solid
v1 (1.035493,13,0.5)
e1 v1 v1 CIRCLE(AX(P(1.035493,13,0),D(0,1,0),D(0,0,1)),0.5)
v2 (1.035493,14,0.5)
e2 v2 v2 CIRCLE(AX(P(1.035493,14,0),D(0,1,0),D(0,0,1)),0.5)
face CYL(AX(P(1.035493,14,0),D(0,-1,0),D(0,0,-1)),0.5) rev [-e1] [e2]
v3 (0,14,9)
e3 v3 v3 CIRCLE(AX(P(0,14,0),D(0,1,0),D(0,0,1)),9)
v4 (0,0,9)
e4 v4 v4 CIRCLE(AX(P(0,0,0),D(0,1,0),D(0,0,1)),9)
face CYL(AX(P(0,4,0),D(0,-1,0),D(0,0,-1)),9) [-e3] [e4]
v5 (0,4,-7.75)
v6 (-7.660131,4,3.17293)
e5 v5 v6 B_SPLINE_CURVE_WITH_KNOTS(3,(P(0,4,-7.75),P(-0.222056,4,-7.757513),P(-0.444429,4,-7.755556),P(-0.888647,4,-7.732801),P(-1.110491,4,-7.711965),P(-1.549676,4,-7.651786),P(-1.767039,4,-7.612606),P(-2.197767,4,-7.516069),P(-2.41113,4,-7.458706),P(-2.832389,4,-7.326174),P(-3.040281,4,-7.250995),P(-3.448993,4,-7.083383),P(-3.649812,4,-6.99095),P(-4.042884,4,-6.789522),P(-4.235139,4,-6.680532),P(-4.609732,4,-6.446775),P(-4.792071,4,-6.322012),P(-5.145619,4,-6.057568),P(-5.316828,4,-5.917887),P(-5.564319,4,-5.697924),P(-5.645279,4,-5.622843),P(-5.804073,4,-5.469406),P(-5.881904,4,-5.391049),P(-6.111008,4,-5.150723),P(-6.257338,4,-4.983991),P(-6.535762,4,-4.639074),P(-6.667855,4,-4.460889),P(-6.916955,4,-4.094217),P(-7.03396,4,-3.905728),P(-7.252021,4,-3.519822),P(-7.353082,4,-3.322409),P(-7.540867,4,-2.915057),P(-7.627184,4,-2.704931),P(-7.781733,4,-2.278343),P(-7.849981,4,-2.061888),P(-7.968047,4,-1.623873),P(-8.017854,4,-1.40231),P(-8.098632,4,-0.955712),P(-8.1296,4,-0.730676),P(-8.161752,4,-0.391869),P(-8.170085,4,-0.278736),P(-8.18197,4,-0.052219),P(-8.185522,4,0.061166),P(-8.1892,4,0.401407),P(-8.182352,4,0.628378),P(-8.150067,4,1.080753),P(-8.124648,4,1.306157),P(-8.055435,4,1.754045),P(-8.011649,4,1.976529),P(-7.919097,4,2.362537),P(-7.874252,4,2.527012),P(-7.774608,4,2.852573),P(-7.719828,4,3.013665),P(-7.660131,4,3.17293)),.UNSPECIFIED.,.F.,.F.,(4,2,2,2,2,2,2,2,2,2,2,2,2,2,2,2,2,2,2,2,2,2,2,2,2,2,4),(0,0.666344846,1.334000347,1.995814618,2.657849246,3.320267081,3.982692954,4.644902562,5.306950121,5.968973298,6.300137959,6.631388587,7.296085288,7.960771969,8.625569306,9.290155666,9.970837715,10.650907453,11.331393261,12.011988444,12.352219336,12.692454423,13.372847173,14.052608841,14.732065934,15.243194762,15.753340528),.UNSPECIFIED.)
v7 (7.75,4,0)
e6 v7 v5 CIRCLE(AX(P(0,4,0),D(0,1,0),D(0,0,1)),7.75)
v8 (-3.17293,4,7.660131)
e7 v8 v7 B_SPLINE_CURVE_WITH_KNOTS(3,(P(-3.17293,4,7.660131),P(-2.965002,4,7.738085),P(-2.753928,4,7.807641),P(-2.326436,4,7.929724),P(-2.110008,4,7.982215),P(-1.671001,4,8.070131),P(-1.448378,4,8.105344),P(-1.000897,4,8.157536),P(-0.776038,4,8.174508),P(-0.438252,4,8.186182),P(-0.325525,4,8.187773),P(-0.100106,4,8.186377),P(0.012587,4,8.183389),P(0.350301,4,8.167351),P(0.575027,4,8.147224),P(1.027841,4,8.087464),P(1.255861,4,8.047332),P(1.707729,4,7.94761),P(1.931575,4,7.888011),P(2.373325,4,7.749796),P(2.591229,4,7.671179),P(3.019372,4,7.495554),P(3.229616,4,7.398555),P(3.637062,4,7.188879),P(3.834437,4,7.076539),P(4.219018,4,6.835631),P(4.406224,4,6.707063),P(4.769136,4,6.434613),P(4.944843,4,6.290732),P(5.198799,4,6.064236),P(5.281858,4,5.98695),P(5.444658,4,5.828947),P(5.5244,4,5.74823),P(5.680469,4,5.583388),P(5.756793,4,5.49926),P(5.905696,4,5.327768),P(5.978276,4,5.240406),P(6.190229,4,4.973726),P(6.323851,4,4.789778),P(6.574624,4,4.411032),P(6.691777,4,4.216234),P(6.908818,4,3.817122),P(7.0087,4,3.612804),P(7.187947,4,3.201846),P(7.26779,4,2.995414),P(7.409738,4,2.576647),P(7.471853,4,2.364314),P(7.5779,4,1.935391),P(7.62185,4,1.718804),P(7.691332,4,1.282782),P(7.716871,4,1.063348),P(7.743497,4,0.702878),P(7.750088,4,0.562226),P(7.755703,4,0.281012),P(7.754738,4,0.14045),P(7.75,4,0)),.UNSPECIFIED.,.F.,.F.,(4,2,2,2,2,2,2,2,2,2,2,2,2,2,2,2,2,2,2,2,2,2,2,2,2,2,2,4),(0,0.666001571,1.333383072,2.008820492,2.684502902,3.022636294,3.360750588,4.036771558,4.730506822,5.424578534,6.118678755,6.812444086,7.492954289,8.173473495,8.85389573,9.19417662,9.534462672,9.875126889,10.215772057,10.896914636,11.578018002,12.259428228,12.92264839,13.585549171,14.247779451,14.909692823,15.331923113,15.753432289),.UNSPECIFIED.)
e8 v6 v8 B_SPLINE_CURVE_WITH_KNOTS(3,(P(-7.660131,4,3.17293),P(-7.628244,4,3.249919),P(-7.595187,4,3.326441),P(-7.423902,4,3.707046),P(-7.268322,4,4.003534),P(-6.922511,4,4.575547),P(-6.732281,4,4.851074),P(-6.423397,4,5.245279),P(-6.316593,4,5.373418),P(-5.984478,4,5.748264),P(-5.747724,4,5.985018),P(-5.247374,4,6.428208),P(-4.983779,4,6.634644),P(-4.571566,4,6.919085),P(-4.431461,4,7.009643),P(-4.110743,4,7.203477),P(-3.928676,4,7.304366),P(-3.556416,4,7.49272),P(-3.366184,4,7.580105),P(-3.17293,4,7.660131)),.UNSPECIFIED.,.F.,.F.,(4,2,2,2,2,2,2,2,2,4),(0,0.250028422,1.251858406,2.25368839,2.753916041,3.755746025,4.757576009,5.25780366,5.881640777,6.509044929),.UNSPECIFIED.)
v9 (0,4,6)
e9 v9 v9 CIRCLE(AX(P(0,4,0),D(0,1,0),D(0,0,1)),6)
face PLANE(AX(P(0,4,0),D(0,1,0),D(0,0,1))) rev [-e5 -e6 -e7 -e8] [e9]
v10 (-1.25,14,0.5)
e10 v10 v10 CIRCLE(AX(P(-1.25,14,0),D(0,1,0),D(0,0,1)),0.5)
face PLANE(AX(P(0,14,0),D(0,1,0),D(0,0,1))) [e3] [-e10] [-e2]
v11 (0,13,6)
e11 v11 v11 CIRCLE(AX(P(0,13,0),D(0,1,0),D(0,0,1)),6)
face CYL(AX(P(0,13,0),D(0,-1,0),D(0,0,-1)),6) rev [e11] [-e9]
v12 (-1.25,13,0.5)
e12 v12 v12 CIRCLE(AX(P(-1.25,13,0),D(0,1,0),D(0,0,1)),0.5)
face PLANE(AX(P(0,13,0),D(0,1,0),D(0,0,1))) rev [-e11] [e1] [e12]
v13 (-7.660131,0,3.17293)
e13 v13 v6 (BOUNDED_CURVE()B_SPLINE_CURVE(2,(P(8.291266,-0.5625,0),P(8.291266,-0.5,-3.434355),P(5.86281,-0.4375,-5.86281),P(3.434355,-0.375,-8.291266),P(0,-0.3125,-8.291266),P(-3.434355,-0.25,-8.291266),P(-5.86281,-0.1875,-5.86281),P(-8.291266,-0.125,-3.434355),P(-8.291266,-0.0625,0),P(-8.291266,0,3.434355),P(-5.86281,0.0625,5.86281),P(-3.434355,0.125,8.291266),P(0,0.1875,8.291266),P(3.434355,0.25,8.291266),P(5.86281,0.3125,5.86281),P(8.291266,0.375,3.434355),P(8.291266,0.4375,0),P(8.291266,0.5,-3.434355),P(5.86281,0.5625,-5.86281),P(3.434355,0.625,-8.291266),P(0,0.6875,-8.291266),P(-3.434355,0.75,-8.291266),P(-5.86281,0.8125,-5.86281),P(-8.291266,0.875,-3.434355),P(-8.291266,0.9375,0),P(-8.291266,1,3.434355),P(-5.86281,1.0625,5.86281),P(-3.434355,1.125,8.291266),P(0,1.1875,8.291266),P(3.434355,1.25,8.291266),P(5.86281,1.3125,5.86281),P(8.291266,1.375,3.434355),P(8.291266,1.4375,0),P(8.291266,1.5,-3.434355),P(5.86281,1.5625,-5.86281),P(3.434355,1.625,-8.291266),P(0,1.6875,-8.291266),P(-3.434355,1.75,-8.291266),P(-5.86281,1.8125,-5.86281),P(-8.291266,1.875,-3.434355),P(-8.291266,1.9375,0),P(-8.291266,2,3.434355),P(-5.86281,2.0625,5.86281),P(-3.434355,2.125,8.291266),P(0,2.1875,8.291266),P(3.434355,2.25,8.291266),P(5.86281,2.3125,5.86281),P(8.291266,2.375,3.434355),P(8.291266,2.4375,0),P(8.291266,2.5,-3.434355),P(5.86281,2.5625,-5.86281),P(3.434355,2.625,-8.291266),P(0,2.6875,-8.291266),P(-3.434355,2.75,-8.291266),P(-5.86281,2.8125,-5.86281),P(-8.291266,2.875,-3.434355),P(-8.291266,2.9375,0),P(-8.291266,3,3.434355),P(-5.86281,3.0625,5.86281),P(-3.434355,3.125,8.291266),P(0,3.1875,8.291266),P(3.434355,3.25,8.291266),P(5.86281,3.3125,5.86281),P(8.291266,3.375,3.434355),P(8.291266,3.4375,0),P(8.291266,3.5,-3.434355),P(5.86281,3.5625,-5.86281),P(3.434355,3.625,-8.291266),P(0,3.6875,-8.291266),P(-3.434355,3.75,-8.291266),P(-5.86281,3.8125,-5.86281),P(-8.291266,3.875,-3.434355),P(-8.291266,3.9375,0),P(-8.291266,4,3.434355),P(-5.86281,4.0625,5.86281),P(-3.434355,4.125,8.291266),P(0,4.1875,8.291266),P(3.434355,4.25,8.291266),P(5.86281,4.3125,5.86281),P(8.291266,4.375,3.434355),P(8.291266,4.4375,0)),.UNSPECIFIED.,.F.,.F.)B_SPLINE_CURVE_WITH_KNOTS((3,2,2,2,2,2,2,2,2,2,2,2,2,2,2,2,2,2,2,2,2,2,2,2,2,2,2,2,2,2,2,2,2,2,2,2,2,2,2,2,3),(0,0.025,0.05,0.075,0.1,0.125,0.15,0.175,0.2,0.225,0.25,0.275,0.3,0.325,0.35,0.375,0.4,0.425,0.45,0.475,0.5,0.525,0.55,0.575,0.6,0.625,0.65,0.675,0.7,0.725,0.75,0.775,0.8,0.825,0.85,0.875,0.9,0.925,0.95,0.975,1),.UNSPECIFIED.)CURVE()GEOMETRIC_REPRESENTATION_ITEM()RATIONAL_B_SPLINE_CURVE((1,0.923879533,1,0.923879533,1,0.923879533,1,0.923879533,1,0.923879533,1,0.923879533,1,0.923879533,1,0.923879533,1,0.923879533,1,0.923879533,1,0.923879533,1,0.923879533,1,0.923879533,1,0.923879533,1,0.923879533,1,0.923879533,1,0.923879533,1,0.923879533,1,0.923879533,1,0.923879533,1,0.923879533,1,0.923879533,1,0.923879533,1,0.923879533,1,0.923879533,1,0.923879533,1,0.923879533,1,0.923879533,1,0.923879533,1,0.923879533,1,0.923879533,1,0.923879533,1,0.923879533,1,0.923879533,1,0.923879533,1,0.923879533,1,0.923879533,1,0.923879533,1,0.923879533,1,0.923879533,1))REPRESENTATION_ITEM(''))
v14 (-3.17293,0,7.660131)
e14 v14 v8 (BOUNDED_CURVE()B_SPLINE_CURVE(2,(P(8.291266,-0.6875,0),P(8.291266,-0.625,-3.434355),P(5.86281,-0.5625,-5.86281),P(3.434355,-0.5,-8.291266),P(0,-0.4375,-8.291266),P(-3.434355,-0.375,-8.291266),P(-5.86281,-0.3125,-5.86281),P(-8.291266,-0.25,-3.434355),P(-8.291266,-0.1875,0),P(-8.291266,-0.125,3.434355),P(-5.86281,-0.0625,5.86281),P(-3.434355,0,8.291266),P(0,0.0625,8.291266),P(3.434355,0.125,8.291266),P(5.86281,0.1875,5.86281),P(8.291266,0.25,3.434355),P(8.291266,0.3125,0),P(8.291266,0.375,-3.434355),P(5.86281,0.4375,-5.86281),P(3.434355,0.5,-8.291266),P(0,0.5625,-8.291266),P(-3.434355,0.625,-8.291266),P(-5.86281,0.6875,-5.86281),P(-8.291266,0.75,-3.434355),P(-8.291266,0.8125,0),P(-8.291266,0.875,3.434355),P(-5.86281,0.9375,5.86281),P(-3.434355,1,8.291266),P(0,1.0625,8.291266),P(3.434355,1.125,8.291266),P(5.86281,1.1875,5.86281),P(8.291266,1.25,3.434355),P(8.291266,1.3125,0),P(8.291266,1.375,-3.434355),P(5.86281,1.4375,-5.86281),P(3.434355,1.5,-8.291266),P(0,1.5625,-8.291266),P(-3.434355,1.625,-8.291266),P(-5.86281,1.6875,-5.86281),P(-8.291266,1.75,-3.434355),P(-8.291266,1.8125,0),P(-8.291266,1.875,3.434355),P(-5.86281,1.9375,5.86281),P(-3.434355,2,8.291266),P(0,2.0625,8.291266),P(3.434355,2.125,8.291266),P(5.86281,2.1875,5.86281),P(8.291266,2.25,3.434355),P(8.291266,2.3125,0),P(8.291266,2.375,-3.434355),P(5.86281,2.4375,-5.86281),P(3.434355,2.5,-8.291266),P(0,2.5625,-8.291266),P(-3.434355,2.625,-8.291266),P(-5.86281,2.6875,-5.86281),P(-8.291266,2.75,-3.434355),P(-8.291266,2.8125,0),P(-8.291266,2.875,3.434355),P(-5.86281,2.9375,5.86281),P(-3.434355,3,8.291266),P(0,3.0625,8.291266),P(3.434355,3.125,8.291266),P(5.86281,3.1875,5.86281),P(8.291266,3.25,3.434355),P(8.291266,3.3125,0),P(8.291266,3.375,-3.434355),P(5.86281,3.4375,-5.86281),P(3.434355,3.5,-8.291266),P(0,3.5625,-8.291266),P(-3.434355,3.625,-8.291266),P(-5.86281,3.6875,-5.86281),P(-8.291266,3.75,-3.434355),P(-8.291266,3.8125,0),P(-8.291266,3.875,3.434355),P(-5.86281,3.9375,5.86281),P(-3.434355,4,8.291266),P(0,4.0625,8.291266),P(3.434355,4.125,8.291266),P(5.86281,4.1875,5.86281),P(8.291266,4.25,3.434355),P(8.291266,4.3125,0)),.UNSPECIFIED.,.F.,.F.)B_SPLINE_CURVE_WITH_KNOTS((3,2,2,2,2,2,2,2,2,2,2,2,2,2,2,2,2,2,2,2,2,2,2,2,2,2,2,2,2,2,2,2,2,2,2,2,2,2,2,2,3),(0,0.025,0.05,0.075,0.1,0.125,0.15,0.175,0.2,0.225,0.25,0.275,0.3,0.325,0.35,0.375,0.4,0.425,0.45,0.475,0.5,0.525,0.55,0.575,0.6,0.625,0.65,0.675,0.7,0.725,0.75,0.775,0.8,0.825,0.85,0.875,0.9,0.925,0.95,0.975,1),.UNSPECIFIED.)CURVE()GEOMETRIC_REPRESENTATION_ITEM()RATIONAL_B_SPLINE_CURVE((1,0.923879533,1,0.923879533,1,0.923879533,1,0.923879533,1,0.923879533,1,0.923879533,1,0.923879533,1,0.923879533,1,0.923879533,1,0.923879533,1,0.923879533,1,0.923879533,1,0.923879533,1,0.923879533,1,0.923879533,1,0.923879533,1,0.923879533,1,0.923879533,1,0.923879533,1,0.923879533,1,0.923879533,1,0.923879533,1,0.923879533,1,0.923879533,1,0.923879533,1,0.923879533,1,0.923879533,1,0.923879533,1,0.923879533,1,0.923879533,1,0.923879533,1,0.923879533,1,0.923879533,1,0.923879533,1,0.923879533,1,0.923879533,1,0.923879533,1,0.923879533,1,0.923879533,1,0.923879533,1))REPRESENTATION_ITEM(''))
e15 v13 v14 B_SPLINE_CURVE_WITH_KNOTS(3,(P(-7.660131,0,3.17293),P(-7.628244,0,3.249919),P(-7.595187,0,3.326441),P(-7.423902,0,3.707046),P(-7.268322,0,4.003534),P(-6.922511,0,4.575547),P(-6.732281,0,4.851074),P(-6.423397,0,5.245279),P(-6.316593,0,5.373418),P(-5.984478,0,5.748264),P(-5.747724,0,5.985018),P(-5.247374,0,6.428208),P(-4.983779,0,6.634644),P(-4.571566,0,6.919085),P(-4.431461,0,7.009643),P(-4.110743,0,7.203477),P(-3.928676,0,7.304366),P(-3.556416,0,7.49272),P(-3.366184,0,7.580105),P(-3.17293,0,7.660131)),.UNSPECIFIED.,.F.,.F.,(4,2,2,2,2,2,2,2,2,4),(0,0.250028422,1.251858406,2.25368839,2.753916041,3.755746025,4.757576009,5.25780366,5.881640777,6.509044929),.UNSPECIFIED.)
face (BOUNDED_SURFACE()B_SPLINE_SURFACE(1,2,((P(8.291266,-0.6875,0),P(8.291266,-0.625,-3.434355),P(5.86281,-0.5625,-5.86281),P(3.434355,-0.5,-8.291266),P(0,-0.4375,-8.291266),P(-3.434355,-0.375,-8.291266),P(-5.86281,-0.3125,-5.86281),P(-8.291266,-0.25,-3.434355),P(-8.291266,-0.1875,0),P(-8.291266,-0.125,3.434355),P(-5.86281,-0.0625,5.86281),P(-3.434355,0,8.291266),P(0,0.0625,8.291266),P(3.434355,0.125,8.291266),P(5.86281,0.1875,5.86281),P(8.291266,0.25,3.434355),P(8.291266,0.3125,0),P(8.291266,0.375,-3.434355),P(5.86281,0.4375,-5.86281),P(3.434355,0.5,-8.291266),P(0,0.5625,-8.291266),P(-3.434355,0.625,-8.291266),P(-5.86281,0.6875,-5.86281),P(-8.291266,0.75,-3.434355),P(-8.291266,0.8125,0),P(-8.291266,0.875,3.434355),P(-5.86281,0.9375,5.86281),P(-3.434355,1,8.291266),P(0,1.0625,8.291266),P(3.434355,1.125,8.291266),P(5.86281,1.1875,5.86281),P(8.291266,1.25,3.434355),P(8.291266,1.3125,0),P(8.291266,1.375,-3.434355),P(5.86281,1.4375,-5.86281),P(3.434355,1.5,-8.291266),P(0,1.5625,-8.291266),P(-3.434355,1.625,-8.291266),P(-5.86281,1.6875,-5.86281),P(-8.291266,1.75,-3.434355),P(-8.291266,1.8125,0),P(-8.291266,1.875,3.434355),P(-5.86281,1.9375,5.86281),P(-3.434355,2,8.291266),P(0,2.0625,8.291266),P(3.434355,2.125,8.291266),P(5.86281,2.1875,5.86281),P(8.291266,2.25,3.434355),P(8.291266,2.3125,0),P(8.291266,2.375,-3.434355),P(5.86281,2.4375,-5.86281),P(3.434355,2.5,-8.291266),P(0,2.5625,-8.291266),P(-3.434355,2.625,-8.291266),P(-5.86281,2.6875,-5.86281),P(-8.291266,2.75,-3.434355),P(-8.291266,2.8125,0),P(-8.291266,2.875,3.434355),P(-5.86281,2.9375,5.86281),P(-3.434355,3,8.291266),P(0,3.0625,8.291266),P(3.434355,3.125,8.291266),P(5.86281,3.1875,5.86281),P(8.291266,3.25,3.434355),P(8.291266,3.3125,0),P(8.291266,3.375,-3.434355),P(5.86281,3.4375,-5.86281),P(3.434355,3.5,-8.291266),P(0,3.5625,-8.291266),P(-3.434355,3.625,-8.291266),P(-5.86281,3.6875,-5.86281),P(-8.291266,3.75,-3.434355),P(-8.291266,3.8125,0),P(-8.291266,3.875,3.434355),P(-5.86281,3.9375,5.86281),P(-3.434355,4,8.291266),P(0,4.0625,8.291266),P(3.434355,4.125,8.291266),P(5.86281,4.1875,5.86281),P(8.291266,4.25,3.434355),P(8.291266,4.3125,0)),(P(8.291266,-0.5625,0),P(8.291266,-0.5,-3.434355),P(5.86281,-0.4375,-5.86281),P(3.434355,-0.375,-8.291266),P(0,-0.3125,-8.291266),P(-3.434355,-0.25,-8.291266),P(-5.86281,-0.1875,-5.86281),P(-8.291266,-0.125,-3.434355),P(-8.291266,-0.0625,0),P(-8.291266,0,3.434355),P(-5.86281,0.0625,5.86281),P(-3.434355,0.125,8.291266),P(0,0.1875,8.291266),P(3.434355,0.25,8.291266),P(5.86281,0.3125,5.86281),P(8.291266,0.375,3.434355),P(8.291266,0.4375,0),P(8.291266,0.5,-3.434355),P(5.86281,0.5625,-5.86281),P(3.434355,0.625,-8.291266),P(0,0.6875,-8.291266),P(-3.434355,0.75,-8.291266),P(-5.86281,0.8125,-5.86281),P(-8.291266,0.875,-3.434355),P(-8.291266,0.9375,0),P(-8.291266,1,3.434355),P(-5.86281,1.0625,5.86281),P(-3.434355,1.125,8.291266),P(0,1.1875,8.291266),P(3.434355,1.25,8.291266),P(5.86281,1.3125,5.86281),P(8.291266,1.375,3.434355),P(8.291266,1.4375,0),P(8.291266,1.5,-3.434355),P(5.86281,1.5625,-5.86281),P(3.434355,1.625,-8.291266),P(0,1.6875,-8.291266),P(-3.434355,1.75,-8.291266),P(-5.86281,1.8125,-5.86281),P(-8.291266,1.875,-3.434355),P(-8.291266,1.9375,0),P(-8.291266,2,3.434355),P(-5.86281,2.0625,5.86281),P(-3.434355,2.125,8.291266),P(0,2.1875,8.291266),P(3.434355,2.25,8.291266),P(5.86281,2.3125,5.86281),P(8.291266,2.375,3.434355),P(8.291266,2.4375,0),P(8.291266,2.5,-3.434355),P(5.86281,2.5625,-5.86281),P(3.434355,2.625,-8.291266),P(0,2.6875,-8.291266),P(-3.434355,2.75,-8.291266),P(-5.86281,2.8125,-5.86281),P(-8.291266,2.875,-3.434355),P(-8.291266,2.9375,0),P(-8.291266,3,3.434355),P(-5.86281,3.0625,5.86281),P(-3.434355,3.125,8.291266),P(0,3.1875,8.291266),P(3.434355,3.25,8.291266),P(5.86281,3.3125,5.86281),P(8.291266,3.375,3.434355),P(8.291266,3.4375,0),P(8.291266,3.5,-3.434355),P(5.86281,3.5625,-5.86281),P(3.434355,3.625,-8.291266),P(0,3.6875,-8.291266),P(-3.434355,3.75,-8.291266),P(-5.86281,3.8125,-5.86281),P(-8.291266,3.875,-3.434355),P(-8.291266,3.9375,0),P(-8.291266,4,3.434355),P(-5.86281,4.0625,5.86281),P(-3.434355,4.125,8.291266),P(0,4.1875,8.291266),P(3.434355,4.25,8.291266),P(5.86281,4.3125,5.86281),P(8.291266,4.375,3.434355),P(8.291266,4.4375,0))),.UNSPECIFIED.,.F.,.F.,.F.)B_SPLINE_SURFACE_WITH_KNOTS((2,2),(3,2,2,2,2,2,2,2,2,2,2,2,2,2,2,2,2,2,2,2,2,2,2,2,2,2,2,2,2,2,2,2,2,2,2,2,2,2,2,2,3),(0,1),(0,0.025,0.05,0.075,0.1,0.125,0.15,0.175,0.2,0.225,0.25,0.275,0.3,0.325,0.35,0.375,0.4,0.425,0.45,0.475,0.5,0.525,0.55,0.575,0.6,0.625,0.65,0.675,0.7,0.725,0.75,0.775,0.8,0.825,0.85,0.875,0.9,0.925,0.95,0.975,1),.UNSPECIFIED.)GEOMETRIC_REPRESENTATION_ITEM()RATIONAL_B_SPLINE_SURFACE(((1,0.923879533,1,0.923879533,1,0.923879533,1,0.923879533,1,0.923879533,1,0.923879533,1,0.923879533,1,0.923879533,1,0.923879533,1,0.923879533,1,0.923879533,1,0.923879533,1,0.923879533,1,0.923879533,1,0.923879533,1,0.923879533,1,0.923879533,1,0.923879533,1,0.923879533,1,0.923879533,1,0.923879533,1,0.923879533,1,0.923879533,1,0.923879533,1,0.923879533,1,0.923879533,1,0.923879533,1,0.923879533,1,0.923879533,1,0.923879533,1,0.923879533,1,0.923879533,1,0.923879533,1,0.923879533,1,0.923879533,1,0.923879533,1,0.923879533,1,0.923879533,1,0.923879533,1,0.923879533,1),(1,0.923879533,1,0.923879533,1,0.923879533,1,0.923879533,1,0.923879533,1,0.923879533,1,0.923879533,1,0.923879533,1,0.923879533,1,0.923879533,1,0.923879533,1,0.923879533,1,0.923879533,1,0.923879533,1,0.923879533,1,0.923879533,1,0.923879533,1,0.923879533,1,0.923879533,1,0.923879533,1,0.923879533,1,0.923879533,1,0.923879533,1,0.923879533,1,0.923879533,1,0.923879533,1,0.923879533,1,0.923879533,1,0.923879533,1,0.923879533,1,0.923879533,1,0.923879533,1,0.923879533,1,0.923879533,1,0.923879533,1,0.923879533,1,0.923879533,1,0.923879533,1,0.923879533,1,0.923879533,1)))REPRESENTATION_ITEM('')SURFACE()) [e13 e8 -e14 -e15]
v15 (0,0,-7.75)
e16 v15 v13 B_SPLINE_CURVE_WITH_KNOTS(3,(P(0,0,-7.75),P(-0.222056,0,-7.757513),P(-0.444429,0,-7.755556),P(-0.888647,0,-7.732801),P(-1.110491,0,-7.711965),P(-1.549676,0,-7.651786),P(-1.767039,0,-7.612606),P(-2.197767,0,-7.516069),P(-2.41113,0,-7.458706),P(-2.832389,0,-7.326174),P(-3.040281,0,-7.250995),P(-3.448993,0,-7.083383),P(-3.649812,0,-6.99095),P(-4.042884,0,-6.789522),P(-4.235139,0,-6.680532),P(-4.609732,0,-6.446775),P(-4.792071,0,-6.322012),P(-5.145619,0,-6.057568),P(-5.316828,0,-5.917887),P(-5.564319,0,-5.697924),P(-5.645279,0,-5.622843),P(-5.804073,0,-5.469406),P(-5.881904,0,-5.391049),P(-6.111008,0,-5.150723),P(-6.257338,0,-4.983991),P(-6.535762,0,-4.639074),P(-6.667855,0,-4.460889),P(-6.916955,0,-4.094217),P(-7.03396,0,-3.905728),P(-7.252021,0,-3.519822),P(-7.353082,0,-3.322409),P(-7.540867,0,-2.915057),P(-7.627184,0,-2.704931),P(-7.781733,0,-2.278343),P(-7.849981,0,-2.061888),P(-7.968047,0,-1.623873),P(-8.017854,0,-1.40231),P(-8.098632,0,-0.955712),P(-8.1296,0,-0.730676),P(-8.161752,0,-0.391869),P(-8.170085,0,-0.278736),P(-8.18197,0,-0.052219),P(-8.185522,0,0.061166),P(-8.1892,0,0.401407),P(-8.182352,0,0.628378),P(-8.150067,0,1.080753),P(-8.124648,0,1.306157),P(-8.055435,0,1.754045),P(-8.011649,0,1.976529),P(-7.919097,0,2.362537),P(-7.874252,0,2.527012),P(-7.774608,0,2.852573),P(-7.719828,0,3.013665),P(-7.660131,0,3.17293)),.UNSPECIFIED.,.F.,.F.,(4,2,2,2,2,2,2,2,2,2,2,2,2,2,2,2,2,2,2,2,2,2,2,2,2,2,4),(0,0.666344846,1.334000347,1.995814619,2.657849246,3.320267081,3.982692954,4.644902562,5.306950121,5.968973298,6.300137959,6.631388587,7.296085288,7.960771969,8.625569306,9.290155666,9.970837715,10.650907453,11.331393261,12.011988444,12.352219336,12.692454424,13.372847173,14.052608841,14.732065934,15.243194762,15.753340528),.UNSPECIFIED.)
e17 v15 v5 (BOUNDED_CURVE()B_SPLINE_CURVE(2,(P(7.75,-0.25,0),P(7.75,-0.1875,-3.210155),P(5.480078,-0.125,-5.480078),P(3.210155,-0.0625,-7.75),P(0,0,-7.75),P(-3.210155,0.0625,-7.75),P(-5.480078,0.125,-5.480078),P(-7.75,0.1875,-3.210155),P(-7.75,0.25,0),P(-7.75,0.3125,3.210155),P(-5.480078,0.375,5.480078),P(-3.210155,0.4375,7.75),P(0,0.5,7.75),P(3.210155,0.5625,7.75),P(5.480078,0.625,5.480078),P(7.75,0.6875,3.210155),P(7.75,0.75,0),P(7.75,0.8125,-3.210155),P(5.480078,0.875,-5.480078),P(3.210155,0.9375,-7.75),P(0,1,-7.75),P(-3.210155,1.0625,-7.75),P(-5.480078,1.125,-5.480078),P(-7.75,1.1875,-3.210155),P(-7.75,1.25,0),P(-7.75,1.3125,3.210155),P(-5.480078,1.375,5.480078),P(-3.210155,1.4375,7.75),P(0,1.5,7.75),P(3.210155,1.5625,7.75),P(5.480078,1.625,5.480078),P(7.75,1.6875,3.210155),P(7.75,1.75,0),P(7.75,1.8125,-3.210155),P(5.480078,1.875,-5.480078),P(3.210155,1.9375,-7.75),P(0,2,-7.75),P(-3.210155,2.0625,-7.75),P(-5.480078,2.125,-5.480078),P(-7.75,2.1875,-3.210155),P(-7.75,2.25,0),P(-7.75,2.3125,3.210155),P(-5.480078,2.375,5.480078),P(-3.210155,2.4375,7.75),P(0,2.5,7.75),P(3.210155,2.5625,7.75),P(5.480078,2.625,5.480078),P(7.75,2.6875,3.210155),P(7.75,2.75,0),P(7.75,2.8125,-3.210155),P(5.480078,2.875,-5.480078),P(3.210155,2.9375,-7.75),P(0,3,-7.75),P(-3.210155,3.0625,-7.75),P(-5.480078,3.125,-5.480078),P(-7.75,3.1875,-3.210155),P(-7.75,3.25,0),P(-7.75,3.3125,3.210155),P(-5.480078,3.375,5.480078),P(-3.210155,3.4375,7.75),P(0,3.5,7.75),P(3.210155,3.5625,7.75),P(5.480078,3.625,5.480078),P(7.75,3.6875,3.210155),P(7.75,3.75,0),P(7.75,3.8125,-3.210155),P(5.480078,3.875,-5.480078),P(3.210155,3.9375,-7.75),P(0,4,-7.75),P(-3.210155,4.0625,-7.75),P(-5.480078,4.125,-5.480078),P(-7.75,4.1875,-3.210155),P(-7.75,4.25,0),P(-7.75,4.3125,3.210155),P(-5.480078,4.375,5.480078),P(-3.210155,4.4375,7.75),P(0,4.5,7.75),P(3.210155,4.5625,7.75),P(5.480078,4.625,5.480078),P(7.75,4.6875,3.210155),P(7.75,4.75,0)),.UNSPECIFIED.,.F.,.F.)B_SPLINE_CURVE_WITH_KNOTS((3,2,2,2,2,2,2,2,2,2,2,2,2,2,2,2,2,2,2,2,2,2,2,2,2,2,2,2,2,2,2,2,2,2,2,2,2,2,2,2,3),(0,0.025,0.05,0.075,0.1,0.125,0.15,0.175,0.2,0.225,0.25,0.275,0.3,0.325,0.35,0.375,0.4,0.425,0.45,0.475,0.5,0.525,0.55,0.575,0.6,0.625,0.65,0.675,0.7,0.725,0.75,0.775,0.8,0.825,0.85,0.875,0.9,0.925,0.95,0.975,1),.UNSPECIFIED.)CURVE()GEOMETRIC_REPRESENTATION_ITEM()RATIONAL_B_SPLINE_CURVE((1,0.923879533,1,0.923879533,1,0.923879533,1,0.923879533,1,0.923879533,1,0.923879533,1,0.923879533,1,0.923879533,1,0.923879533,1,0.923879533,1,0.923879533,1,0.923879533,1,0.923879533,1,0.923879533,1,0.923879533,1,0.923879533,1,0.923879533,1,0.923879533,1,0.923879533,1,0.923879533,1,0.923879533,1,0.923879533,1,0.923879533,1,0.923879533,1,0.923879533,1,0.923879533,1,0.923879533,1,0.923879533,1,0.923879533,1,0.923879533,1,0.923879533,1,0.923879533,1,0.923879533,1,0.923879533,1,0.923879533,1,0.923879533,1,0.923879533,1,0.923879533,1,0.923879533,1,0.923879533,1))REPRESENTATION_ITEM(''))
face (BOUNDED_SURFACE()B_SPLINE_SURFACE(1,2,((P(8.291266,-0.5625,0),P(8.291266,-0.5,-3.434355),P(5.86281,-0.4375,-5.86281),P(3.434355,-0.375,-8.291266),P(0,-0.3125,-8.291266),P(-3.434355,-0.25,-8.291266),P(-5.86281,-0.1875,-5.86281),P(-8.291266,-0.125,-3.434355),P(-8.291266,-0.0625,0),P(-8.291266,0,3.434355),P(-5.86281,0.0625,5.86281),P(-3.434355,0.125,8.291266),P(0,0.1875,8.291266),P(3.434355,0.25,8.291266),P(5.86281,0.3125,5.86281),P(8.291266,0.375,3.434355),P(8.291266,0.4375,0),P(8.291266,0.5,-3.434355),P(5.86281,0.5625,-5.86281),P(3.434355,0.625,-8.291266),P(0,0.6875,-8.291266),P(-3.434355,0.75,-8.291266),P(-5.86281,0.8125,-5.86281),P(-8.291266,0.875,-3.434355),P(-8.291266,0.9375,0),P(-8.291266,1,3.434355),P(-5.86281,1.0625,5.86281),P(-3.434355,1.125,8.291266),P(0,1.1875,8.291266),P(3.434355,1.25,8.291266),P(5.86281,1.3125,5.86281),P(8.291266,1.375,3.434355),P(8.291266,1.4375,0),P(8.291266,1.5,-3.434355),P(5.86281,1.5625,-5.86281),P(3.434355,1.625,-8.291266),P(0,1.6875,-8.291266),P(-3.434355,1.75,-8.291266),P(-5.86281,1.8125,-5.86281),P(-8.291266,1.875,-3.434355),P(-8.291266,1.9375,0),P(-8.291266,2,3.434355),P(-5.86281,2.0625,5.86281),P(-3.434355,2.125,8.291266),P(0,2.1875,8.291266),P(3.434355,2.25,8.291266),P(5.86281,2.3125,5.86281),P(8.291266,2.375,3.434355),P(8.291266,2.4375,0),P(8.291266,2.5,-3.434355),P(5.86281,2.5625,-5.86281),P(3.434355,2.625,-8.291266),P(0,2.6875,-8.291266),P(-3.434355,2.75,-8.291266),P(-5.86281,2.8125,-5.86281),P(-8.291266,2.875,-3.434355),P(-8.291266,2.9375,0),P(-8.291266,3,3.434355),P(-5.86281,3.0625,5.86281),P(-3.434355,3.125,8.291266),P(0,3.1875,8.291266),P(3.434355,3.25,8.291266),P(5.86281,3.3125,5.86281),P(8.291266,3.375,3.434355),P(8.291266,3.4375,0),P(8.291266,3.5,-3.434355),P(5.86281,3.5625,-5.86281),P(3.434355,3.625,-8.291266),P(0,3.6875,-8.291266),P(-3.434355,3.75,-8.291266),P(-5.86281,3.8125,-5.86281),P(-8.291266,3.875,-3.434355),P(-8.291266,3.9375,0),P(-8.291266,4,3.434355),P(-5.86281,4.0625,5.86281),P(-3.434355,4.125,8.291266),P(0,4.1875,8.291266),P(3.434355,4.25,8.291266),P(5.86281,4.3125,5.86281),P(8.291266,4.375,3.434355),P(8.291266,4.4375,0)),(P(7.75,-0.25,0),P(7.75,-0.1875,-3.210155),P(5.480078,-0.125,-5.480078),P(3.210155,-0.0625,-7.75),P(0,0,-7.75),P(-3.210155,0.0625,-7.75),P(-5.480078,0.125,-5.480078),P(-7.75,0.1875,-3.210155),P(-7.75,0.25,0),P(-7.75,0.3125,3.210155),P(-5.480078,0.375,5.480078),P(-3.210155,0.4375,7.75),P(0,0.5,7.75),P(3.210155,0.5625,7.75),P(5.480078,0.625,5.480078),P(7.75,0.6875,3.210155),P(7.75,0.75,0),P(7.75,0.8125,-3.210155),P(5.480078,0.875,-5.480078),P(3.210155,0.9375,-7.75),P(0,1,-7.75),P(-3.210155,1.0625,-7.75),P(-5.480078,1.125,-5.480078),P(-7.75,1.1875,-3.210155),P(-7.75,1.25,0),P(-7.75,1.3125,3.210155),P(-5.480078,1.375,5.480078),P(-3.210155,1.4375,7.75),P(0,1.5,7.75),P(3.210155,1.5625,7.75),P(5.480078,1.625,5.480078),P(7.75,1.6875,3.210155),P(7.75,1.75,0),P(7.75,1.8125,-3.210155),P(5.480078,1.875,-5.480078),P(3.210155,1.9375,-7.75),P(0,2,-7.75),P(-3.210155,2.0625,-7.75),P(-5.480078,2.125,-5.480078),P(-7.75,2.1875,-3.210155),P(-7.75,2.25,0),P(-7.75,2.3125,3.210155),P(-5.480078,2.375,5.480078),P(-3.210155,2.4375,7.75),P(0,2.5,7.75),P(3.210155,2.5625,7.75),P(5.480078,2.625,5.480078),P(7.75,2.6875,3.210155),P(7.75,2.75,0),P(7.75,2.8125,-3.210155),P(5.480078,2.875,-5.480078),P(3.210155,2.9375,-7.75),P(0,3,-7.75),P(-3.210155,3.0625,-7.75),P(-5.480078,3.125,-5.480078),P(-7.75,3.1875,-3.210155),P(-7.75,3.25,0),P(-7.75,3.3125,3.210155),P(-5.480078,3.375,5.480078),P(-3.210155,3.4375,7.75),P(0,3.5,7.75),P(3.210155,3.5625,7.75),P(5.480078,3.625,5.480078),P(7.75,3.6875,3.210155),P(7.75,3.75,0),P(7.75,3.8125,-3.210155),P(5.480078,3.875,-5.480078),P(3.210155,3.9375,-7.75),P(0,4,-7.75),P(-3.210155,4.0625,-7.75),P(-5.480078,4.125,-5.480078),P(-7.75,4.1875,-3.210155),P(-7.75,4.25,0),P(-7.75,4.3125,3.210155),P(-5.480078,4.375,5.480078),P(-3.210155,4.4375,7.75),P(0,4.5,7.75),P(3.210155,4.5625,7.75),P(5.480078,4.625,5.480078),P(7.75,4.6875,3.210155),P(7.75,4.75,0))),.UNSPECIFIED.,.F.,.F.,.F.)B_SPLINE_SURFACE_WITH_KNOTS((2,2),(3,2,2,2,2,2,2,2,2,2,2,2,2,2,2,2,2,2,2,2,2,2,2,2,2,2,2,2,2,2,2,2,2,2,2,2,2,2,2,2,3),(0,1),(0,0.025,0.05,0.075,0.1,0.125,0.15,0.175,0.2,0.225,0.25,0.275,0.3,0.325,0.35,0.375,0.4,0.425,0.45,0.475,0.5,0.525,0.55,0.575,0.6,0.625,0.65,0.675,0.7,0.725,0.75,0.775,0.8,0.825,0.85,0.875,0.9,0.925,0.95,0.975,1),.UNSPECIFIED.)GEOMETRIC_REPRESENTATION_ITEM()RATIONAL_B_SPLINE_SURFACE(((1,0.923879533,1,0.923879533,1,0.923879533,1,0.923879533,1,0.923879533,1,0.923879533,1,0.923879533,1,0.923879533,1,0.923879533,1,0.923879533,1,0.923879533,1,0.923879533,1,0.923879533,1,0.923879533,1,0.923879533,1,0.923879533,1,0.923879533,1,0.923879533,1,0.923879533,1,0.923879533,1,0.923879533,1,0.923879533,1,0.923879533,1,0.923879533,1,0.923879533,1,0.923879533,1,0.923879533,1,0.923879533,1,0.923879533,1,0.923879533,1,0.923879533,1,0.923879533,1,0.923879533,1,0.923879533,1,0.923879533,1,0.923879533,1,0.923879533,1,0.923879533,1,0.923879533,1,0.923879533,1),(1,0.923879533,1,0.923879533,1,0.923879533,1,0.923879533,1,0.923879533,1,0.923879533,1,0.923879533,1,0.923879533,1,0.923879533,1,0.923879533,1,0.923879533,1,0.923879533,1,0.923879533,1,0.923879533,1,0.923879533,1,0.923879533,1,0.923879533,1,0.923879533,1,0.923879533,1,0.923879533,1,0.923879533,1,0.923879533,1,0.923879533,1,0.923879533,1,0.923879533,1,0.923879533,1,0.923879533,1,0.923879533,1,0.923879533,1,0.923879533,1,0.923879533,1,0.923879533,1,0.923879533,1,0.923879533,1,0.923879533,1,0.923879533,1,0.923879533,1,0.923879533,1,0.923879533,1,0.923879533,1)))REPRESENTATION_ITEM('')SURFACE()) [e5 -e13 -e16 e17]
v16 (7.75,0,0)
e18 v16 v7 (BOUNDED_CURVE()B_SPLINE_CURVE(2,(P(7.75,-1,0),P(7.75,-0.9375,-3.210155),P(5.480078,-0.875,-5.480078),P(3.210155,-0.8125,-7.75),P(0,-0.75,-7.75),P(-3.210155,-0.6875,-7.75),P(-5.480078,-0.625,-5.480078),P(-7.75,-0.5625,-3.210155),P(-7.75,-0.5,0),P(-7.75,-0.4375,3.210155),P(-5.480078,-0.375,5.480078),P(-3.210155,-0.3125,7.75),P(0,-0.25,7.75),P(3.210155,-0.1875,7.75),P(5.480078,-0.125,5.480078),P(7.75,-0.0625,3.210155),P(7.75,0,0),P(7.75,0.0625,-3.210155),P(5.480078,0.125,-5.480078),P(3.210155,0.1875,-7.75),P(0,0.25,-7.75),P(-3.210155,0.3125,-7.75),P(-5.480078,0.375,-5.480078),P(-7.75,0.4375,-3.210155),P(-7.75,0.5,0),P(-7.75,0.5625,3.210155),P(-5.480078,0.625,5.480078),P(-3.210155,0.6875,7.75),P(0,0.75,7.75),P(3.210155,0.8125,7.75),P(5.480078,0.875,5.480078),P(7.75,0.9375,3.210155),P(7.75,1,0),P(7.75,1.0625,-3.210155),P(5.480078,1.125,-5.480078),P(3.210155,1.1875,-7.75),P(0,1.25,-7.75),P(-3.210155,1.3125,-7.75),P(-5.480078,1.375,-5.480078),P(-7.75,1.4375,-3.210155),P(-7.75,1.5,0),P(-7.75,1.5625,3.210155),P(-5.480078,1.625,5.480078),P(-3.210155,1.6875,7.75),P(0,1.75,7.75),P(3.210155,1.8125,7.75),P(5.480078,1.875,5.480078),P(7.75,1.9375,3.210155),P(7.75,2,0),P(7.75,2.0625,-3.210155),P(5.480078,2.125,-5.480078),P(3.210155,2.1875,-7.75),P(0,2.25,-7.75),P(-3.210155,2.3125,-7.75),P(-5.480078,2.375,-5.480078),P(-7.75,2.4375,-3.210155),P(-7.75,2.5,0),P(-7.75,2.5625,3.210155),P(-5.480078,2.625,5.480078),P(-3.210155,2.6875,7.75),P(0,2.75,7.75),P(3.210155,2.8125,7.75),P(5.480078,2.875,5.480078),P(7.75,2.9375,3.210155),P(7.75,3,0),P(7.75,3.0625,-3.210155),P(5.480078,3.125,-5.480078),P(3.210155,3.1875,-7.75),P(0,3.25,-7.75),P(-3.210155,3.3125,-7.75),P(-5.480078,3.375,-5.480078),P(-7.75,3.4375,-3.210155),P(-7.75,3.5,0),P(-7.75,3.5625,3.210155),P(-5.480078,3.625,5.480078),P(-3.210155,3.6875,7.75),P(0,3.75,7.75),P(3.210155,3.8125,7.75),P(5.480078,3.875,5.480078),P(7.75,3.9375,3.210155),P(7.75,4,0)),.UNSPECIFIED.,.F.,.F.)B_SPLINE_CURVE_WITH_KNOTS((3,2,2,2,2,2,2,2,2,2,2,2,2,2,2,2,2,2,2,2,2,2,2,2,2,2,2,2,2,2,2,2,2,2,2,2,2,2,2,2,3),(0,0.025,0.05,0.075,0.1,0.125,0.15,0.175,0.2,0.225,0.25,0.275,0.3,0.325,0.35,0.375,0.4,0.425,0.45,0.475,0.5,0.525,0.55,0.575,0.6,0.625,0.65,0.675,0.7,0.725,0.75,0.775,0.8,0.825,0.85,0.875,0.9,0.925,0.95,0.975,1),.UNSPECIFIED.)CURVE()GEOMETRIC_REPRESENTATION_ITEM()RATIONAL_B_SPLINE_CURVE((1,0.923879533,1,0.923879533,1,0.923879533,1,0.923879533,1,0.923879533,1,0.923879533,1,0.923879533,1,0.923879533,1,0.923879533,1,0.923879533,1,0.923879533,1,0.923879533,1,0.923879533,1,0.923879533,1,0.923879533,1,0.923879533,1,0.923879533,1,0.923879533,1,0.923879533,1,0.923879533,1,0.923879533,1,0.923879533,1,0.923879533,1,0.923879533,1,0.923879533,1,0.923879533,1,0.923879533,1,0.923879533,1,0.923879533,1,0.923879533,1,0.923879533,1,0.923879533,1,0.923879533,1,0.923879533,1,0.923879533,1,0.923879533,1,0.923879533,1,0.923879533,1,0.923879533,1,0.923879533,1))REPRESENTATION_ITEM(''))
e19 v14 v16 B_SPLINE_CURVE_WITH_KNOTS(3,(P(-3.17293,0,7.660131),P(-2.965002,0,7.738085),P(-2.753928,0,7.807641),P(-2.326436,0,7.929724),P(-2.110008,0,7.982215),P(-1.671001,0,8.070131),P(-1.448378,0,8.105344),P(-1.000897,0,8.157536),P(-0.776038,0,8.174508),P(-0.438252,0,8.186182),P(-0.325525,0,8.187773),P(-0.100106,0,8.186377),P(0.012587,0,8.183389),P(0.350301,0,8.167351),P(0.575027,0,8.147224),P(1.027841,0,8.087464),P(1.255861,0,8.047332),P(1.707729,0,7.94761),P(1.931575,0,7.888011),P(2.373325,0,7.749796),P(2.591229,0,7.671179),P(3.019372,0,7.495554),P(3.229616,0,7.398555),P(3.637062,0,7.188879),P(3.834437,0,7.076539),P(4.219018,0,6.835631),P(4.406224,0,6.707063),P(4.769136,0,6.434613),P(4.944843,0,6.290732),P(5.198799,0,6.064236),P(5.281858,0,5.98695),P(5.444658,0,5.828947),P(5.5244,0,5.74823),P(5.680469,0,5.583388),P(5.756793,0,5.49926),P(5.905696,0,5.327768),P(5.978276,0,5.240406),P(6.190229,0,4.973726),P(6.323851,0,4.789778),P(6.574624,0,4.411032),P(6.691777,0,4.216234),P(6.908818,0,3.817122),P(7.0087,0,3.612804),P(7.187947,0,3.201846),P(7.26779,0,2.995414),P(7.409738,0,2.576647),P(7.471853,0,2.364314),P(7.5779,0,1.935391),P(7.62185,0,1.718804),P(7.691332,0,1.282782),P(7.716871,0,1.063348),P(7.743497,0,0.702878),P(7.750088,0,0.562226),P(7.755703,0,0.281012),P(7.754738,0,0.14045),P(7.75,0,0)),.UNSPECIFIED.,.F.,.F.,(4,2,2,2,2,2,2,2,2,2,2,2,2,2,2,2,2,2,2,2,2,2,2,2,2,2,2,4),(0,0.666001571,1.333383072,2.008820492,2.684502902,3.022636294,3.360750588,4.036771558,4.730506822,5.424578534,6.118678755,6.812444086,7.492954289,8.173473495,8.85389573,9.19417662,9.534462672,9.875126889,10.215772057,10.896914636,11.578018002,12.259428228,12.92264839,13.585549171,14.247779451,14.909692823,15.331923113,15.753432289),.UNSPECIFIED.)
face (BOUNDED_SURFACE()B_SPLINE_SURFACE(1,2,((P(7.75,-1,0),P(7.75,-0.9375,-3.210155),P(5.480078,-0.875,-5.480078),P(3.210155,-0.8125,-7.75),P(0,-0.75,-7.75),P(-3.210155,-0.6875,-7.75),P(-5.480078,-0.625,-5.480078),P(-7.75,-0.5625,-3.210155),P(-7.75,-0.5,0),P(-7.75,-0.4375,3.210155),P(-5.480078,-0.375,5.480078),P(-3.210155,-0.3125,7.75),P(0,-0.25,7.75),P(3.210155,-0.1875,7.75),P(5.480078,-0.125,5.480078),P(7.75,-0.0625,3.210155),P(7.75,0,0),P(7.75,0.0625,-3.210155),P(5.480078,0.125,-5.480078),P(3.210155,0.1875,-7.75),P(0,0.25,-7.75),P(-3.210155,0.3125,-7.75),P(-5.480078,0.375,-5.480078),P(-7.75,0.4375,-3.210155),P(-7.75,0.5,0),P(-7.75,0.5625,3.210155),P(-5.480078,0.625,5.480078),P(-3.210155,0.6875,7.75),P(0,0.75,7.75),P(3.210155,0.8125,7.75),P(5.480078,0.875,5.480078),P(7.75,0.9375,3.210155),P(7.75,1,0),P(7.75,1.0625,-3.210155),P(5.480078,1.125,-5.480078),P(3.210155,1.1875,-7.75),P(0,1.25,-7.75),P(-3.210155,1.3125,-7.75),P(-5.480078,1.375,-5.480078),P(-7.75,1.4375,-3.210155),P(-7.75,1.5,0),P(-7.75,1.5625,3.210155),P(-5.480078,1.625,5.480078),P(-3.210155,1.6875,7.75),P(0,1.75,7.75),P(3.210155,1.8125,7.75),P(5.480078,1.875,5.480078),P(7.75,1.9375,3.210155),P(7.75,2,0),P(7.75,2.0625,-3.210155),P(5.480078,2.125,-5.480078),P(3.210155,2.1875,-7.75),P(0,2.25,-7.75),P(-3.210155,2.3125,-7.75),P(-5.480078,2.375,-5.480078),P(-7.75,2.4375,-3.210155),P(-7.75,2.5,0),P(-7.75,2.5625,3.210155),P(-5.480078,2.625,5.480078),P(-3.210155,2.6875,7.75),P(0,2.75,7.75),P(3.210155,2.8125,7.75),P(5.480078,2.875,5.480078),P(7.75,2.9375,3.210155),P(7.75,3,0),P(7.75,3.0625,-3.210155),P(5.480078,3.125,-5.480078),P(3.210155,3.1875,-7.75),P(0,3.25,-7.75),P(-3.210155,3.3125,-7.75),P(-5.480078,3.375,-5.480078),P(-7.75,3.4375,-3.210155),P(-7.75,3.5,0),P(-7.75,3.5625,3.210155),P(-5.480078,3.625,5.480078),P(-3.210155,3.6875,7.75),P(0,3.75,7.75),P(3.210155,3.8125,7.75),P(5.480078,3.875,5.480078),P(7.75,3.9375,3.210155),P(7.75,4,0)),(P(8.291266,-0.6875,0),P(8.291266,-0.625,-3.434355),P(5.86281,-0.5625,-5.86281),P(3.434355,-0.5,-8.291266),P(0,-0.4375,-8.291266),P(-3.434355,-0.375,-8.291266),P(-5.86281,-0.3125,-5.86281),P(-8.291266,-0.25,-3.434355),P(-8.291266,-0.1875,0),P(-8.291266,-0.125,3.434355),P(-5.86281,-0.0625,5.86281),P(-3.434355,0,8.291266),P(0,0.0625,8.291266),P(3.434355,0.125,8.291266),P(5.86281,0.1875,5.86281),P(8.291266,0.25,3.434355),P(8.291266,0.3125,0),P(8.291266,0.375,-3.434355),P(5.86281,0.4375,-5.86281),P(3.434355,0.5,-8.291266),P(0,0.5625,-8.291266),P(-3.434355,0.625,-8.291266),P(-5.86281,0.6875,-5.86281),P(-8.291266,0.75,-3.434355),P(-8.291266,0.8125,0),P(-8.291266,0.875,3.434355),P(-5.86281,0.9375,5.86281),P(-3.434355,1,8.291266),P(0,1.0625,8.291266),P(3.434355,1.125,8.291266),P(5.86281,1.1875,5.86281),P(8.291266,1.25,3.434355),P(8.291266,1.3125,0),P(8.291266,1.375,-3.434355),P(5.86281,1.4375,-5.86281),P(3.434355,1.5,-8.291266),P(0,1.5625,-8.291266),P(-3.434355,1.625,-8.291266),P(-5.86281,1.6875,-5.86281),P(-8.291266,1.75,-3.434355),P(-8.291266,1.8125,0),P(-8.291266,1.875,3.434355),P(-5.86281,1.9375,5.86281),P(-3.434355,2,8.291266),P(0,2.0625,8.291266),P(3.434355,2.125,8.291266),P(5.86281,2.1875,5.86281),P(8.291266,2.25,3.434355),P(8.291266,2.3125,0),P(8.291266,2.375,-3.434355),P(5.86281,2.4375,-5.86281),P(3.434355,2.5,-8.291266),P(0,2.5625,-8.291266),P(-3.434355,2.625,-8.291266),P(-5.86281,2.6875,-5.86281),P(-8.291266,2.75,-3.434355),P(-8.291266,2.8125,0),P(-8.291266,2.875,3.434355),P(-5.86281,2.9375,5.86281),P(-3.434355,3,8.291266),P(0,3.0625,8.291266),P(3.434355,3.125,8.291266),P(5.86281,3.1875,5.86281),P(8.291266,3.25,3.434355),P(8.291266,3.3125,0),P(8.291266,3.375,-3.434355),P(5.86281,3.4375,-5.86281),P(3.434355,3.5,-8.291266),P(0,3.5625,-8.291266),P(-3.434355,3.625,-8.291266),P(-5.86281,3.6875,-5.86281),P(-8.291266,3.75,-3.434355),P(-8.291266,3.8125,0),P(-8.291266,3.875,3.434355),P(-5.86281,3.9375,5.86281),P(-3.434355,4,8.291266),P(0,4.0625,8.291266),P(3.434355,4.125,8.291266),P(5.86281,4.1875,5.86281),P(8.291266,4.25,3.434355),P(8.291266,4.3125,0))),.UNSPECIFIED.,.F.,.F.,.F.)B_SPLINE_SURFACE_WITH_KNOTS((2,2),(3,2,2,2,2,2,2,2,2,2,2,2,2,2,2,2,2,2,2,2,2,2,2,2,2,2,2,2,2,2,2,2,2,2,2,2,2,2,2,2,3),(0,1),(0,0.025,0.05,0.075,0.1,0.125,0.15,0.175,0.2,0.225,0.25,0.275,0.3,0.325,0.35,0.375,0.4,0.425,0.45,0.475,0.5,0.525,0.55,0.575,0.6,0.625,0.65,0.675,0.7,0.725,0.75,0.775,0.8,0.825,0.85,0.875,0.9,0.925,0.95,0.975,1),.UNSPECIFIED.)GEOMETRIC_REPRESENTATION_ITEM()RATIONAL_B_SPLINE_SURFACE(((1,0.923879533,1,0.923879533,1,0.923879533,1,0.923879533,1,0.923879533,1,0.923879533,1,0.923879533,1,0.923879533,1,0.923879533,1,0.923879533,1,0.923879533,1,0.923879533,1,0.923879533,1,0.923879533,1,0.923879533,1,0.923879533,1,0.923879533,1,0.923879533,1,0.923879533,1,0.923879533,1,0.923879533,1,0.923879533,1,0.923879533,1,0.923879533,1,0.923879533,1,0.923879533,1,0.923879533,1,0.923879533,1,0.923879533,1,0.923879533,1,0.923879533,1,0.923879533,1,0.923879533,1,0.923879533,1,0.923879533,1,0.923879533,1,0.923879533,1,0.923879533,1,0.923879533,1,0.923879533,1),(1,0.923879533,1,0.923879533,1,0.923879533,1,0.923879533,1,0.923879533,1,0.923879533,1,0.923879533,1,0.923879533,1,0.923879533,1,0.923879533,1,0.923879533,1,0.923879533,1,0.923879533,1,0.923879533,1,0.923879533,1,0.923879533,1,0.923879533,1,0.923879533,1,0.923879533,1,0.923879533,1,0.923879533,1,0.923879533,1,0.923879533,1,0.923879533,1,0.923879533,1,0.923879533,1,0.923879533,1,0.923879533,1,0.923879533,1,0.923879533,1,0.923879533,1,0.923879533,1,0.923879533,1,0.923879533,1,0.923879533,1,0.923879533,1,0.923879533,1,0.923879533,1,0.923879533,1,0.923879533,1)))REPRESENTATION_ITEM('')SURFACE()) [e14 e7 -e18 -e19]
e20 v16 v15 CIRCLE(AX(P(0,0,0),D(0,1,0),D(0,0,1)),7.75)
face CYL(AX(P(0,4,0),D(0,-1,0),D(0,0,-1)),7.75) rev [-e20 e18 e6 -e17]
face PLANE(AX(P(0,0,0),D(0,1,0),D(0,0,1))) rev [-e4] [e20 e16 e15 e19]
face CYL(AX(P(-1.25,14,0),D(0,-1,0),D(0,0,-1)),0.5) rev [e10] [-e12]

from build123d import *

# Parameters (mm, degrees)
SKETCH1_R           = 9
SKETCH1_R_2         = 7.75
BOSS_EXTRUDE1_DEPTH = 4
SKETCH2_R           = 9
SKETCH2_R_2         = 6
BOSS_EXTRUDE2_DEPTH = 9
THREAD2_PITCH       = 1
THREAD2_TO          = 5
SKETCH3_R           = 9
SKETCH3_R_2         = 0.5
BOSS_EXTRUDE3_DEPTH = 1


with BuildPart() as part:
    # Sketch1 → Boss-Extrude1 (new body)
    with BuildSketch(Plane(origin=(0, 0, 0), x_dir=(1, 0, 0), z_dir=(0, 1, 0))):
        with Locations(Location((0, 0, 0), (0, 0, 270))):
            Circle(SKETCH1_R)
        with Locations(Location((0, 0, 0), (0, 0, 270))):
            Circle(SKETCH1_R_2, mode=Mode.SUBTRACT)
    extrude(amount=BOSS_EXTRUDE1_DEPTH)

    # Sketch2 → Boss-Extrude2 (add)
    with BuildSketch(Plane(origin=(0, 4, 0), x_dir=(1, 0, 0), z_dir=(0, 1, 0))):
        with Locations(Location((0, 0, 0), (0, 0, 270))):
            Circle(SKETCH2_R)
        with Locations(Location((0, 0, 0), (0, 0, 270))):
            Circle(SKETCH2_R_2, mode=Mode.SUBTRACT)
    extrude(amount=BOSS_EXTRUDE2_DEPTH)

    # Thread2: arcs per turn and ends read off the stored shape
    # Thread2: the profile of Thread Profile2 profile screwed along a right-hand helix through 5 turns, 8 arcs to a turn; built about Z, then put on its axis
    thread2_z = Axis((0, 0, 0), (0, 0, 1))
    thread2_corners = [(7.7497, 0, -0.000173205), (8.291265875, 0, 0.312499999), (8.291265875, 0, 0.437499999), (7.7497, 0, 0.750173202)]
    with BuildLine(mode=Mode.PRIVATE) as thread2_profile:
        Line(thread2_corners[0], thread2_corners[1])
        Line(thread2_corners[1], thread2_corners[2])
        Line(thread2_corners[2], thread2_corners[3])
        Line(thread2_corners[3], thread2_corners[0])
    thread2_cap = Face(thread2_profile.wire())
    thread2_turn_angles = [0, 22.5, 45, 67.5, 90, 112.5, 135, 157.5, 180, 202.5, 225, 247.5, 270, 292.5, 315, 337.5, 360]
    thread2_turn_weights = [1, 0.9238795325112867, 1, 0.9238795325112867, 1, 0.9238795325112867, 1, 0.9238795325112867, 1, 0.9238795325112867, 1, 0.9238795325112867, 1, 0.9238795325112867, 1, 0.9238795325112867, 1]
    thread2_turn_rails = [Edge.make_bspline([Vector(p[0], p[1], 0).rotate(thread2_z, thread2_turn_angles[k]) / thread2_turn_weights[k] + Vector(0, 0, p[2] + THREAD2_PITCH * thread2_turn_angles[k] / 360) for k in range(17)], [0, 0, 0, 1, 1, 2, 2, 3, 3, 4, 4, 5, 5, 6, 6, 7, 7, 8, 8, 8], 2, thread2_turn_weights) for p in thread2_corners]
    thread2_turn_sides = [Face.make_surface_from_curves(thread2_turn_rails[p[0]], thread2_turn_rails[p[1]]) for p in [(0, 1), (1, 2), (2, 3), (3, 0)]]
    thread2 = Plane(origin=(0, -1, 0), x_dir=(1, 0, 0), z_dir=(0, 1, 0)) * split(Solid(Shell([*[p.moved(Location((0, 0, THREAD2_PITCH * i))) for i in range(5) for p in thread2_turn_sides], thread2_cap, thread2_cap.rotate(thread2_z, 1800).moved(Location((0, 0, THREAD2_PITCH * 1800 / 360)))])), bisect_by=Plane.XY.offset(THREAD2_TO), keep=Keep.BOTTOM, mode=Mode.PRIVATE)
    add(thread2, mode=Mode.SUBTRACT)

    # Sketch3 → Boss-Extrude3 (add)
    with BuildSketch(Plane(origin=(0, 13, 0), x_dir=(1, 0, 0), z_dir=(0, 1, 0))):
        with Locations(Location((0, 0, 0), (0, 0, 270))):
            Circle(SKETCH3_R)
        with Locations(Location((-1.25, 0, 0), (0, 0, 270))):
            Circle(SKETCH3_R_2, mode=Mode.SUBTRACT)
        with Locations(Location((1.035492966, 0, 0), (0, 0, 270))):
            Circle(SKETCH3_R_2, mode=Mode.SUBTRACT)
    extrude(amount=BOSS_EXTRUDE3_DEPTH)


solid = part.part
